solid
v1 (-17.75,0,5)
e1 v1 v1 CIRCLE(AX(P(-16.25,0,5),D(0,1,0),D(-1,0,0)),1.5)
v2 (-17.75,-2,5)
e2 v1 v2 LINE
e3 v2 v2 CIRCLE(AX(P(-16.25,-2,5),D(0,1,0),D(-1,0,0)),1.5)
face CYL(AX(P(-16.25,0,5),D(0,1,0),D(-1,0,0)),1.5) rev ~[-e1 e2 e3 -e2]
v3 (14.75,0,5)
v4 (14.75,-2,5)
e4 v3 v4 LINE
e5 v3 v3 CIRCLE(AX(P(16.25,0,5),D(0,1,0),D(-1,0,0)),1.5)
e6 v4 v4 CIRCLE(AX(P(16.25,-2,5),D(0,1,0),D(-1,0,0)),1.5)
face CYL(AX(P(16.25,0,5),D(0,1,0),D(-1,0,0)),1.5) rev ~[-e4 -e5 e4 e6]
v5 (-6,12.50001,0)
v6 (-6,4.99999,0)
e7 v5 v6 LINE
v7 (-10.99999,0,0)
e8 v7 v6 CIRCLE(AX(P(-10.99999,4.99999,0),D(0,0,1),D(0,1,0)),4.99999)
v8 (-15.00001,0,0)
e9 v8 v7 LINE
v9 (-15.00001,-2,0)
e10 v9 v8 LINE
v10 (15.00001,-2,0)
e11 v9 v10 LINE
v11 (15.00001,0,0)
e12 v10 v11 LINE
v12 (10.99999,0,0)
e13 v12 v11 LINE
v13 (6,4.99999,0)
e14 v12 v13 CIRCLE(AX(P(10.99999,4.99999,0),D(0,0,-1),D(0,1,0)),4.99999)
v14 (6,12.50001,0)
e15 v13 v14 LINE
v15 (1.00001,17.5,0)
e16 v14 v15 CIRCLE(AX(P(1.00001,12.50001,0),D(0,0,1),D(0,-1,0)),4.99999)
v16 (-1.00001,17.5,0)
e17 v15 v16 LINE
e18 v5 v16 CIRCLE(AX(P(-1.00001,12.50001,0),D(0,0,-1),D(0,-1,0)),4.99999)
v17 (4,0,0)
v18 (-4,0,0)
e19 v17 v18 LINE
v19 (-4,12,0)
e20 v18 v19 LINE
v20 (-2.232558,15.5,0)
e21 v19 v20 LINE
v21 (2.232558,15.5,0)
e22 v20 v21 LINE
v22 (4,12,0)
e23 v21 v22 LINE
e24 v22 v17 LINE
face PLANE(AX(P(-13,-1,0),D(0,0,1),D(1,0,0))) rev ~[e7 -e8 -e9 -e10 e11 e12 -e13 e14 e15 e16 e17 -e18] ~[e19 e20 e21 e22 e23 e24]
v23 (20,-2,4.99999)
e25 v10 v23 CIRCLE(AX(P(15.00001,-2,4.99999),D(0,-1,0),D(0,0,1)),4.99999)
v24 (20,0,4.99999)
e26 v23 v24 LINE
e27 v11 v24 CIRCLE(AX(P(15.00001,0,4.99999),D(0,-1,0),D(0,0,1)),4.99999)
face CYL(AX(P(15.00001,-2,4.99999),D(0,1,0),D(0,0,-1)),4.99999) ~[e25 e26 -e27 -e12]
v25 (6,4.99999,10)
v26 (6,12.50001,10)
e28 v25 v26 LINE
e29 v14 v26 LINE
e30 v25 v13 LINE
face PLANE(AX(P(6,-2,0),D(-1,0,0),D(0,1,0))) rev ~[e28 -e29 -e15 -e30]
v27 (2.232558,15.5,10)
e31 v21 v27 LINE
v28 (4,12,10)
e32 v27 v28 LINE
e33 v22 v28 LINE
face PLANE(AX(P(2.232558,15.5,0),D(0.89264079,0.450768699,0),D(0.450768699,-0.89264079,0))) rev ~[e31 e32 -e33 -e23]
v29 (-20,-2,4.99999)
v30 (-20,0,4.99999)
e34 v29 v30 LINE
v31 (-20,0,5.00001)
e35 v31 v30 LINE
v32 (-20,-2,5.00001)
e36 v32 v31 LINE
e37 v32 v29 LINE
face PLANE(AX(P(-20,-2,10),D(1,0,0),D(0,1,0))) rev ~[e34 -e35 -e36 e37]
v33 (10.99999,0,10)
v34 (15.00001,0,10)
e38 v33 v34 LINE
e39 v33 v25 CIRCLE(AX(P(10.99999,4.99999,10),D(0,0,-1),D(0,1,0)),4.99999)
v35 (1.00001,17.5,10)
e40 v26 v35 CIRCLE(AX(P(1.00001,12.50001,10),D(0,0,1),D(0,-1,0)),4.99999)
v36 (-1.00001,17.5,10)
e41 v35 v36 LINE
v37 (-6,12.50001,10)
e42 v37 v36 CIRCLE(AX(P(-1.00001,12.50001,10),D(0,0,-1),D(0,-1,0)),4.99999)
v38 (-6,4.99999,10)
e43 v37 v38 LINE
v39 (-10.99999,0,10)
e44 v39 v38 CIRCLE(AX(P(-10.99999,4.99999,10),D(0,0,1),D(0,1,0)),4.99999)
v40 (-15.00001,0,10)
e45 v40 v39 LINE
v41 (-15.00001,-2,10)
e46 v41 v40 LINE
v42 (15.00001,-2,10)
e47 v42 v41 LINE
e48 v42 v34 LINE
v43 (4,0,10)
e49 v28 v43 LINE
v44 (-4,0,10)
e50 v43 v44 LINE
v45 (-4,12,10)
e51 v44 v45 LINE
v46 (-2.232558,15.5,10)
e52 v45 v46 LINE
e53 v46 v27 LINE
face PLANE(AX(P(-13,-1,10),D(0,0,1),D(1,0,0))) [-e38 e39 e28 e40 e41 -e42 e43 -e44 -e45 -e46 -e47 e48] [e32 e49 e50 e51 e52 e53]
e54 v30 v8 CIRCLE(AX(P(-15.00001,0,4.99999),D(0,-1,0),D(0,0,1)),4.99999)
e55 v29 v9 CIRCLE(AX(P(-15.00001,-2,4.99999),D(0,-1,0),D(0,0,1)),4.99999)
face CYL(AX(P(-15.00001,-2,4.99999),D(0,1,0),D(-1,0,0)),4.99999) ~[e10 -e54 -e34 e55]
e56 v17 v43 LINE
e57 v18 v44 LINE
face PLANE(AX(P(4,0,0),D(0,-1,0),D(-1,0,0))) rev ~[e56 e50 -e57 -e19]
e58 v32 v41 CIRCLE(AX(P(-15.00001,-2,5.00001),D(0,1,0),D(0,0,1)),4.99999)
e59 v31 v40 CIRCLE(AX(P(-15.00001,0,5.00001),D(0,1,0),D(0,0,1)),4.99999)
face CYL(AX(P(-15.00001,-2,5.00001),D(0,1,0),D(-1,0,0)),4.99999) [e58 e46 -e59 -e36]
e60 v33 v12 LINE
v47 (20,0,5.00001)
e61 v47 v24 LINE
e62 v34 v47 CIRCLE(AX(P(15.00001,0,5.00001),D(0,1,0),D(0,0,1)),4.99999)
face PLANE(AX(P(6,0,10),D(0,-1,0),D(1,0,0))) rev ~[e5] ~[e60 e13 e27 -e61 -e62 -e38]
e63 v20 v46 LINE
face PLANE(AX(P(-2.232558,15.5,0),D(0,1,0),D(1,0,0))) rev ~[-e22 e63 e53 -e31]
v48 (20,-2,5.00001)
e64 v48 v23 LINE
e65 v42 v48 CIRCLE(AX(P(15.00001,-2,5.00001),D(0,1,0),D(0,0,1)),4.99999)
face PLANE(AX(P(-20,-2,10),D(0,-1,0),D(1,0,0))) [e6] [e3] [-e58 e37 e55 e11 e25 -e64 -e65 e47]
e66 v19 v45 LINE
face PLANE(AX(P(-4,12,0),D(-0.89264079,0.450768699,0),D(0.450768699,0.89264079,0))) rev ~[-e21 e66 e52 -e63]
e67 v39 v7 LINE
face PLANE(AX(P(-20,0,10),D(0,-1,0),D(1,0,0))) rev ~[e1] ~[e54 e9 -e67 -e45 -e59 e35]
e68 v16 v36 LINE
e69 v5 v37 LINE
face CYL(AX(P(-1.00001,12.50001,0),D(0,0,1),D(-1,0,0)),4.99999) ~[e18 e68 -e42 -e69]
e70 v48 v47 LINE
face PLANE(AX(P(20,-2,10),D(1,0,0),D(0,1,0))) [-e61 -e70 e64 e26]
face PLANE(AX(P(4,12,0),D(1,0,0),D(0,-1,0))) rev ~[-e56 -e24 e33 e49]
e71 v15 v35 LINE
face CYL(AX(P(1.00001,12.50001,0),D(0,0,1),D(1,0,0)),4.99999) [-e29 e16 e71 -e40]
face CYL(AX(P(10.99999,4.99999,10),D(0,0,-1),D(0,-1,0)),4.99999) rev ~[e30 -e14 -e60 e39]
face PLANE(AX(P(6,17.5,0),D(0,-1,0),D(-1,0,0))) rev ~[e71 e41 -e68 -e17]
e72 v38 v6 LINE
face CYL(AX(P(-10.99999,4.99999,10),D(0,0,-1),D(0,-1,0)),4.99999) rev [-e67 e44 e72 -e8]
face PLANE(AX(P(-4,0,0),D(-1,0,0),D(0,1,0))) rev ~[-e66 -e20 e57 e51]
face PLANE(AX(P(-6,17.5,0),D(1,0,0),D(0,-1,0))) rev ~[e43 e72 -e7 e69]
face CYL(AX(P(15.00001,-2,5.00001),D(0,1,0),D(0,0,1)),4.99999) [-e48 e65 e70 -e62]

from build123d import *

# Parameters (mm, degrees)
F1_DEPTH = 10
F2_W     = 14
F2_H     = 2
F3_DEPTH = 10
F4_R     = 1.5
F5_DEPTH = 25
F6_R     = 4.99999


# Not quite as in the source:
# - a fillet or chamfer is up to 0.001 mm smaller than in the source, because OpenCascade refuses the exact size


with BuildPart() as f1:
    # F0 (on Top) → F1 (new body)
    with BuildSketch(Plane.XY):
        Polygon((4, 0), (0, 0), (-4, 0), (-6, 0), (-6, -2), (6, -2), (6, 0), align=None)
        Polygon((-6, 0), (-4, 0), (-4, 12), (-2.2325584196, 15.5), (2.2325584196, 15.5), (4, 12), (4, 0), (6, 0), (6, 17.5), (-6, 17.5), align=None)
    extrude(amount=F1_DEPTH)

    # F2 (on face) → F3 (join)
    with BuildSketch(Plane.XY.offset(10)):
        with Locations((-13, -1)):
            Rectangle(F2_W, F2_H)
        with Locations((13, -1)):
            Rectangle(F2_W, F2_H)
    extrude(amount=-F3_DEPTH)

    # F4 (on face) → F5 (cut)
    with BuildSketch(Plane(origin=(0, 0, 0), x_dir=(-1, 0, 0), z_dir=(0, 1, 0))):
        with Locations((16.25, 5)):
            Circle(F4_R)
        with Locations((-16.25, 5)):
            Circle(F4_R)
    extrude(amount=-F5_DEPTH, mode=Mode.SUBTRACT)

    # F6 (radius 5 in the source; OpenCascade refuses exactly that, so slightly less here)
    f6_edges = [f1.edges().sort_by_distance(p)[0] for p in [
        (-6, 17.5, 5),
        (6, 17.5, 5),
        (-6, 0, 5),
        (6, 0, 5),
        (-20, -1, 10),
        (-20, -1, 0),
        (20, -1, 10),
        (20, -1, 0),
    ]]
    fillet(f6_edges, radius=F6_R)


solid = f1.part
